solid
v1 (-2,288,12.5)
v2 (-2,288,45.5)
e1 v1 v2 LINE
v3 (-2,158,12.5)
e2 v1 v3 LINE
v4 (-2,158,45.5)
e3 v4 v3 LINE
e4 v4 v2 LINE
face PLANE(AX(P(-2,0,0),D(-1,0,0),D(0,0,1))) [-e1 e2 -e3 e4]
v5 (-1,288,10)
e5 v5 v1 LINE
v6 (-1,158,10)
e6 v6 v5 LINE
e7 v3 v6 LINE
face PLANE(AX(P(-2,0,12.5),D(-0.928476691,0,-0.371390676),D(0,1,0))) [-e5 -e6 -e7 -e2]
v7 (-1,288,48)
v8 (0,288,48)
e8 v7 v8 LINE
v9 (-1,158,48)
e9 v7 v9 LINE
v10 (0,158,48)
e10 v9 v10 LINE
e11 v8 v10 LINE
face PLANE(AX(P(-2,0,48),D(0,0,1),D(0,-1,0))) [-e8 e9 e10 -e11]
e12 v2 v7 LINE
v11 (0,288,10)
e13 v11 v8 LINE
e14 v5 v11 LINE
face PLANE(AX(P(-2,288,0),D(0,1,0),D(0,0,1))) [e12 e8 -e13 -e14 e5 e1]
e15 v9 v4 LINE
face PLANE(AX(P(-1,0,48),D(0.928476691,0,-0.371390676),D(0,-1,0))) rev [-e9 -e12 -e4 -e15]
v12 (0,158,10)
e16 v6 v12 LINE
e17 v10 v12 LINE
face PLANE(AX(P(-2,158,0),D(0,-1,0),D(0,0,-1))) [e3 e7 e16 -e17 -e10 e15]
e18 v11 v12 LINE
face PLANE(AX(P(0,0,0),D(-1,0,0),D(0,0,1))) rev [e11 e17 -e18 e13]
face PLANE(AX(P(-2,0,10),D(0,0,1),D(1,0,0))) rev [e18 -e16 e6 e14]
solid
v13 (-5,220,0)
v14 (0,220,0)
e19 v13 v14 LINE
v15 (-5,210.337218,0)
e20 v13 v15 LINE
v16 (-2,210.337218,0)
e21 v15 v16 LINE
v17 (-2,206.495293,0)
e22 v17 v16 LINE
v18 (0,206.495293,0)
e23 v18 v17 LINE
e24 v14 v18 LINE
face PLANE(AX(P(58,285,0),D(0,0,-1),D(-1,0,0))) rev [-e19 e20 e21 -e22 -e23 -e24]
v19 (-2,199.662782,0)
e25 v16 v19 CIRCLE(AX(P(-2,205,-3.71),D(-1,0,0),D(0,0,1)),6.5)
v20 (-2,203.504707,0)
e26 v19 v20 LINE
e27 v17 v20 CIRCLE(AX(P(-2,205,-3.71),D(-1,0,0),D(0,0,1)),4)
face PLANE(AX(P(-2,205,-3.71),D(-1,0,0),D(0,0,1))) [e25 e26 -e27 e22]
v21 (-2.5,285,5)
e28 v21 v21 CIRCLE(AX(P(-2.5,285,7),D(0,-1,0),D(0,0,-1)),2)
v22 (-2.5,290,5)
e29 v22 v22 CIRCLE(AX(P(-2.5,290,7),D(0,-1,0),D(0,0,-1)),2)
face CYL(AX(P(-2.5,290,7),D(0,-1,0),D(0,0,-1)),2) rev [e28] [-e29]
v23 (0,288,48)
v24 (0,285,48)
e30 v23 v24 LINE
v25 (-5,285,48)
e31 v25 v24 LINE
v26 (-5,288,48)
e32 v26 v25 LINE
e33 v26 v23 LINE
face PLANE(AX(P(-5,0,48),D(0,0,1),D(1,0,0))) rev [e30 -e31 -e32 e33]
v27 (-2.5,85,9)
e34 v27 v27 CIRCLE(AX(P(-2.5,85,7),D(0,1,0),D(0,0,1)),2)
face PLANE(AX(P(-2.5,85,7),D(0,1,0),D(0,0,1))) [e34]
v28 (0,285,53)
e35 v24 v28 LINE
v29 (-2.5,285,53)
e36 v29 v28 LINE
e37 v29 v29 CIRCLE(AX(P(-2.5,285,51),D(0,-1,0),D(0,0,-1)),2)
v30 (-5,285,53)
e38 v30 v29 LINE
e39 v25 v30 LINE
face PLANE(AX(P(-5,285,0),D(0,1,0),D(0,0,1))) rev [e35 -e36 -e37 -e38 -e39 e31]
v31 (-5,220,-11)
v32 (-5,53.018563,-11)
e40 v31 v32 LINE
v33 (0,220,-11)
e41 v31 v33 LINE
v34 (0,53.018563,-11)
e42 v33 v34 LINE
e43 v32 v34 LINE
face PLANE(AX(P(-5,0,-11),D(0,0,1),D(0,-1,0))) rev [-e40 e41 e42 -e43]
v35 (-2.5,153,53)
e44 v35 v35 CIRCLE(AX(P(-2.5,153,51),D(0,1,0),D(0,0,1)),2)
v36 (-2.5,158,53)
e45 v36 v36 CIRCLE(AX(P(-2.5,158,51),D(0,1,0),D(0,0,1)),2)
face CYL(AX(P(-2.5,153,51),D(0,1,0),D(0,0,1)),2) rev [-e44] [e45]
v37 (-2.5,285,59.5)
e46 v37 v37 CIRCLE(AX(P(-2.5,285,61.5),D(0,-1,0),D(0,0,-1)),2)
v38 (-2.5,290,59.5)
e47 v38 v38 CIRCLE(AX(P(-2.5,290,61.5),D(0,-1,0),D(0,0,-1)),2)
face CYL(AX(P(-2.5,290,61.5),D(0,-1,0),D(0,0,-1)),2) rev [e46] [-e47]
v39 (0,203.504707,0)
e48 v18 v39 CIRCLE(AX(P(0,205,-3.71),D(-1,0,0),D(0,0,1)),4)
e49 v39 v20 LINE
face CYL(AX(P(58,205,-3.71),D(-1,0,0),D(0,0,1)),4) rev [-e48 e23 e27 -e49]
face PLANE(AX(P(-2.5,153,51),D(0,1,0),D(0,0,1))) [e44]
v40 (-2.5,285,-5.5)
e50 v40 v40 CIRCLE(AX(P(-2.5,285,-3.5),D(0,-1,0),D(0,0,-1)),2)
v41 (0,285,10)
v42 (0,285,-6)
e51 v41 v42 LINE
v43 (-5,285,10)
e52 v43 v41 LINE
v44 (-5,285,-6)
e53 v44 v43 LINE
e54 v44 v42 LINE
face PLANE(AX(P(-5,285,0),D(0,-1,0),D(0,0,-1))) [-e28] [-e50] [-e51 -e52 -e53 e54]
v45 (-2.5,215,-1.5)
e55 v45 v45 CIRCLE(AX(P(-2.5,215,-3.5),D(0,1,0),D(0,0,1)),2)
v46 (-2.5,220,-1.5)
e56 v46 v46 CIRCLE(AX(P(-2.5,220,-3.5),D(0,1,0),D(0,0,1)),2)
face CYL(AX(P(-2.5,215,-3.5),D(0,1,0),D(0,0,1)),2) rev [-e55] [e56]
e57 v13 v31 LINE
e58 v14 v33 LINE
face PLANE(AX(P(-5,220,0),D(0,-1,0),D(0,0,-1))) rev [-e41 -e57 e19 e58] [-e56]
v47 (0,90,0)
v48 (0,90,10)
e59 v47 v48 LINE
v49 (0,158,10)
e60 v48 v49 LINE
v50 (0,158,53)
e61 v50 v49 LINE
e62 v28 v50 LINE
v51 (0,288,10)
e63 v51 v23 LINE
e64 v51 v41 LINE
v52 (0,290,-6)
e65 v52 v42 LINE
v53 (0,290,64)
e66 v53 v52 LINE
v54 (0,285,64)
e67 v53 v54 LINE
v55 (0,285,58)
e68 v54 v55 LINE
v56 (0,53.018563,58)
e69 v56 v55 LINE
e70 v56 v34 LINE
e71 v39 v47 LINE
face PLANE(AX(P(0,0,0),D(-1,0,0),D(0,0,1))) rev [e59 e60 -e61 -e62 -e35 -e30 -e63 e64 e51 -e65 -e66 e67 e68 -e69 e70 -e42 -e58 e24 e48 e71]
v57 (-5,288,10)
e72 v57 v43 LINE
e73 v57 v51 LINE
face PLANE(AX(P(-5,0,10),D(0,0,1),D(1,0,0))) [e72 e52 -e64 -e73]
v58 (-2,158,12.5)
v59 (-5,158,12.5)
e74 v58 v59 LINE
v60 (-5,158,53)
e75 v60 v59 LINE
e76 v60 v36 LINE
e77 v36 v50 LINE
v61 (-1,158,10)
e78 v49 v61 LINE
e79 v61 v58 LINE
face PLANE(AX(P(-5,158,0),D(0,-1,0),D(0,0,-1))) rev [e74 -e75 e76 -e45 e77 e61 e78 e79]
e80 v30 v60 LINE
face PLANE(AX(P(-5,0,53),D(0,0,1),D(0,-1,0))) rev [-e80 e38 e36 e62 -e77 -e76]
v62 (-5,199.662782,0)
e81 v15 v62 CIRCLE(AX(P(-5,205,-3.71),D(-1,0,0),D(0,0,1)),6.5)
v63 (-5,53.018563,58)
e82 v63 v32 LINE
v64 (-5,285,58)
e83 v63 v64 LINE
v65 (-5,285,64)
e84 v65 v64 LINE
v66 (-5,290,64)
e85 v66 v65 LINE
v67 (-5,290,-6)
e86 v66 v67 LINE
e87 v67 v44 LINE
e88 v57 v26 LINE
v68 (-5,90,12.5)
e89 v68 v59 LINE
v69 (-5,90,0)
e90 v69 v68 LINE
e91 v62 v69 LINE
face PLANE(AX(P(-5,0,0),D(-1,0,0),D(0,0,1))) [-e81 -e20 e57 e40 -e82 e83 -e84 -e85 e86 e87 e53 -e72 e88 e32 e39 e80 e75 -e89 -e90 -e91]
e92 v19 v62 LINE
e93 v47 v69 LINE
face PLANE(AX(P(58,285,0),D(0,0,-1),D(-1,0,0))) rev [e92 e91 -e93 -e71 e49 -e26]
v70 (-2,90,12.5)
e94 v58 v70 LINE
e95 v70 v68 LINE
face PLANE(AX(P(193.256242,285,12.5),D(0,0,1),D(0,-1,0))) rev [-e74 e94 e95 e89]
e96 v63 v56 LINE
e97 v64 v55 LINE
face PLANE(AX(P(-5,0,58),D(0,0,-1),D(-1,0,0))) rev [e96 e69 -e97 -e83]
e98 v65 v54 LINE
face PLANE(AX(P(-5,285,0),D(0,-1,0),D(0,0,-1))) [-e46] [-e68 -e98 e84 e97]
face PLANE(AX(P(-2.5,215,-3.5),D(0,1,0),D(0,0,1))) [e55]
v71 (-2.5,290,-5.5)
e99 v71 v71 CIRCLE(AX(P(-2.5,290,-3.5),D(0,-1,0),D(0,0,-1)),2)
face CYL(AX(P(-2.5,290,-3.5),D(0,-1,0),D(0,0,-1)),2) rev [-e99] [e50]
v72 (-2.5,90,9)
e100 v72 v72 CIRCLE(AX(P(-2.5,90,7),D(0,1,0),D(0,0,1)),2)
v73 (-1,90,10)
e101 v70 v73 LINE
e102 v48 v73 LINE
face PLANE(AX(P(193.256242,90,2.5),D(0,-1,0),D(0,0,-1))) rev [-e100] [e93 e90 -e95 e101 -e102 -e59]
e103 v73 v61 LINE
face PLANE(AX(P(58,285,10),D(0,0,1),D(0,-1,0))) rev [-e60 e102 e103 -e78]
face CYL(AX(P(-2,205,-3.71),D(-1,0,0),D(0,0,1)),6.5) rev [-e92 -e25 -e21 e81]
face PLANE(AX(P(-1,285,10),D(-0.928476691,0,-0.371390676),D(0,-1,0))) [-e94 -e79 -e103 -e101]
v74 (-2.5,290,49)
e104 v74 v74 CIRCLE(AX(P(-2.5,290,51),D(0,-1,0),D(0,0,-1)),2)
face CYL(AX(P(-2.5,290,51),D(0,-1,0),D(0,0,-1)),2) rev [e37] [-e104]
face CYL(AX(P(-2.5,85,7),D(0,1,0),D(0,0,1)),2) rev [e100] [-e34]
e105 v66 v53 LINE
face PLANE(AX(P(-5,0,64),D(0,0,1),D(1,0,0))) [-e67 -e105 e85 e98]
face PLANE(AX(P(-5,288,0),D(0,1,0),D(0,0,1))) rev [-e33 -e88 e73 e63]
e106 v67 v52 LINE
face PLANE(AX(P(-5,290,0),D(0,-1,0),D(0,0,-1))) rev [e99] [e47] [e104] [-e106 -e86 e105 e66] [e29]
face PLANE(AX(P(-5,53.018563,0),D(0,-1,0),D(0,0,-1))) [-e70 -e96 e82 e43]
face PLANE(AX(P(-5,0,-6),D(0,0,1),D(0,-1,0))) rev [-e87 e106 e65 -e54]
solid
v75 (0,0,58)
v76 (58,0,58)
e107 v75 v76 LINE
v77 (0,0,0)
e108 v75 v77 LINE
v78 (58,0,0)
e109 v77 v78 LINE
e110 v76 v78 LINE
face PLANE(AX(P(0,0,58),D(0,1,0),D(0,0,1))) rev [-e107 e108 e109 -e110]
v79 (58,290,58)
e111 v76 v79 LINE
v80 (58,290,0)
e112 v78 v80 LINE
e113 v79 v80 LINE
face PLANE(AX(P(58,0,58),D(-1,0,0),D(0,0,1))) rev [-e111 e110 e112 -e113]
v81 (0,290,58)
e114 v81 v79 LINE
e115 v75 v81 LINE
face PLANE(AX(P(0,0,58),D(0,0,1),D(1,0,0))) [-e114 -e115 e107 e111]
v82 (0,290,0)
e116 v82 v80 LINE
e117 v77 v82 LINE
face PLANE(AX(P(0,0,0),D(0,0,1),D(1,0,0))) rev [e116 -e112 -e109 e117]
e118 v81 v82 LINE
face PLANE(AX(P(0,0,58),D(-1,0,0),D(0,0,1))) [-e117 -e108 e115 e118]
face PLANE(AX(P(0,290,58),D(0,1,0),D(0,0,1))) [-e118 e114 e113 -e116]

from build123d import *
from OCP.BRepFilletAPI import BRepFilletAPI_MakeChamfer

# Parameters (mm, degrees)
ESQUISSE1_W              = 58
ESQUISSE1_H              = 58
BOSS_EXTRU_2_DEPTH       = 58
BOSS_EXTRU_3_DEPTH       = 5
BOSS_EXTRU_4_DEPTH       = 2
ESQUISSE11_R             = 2
ENL_V_MAT_EXTRU_18_DEPTH = 5
ESQUISSE12_R             = 2
ENL_V_MAT_EXTRU_19_DEPTH = 5
ESQUISSE13_R             = 2
ENL_V_MAT_EXTRU_20_DEPTH = 298.800268637
ESQUISSE14_W             = 10
ESQUISSE14_H             = 195
ENL_V_MAT_EXTRU_21_DEPTH = 3
ESQUISSE15_W             = 7.5
ESQUISSE15_H             = 195
ENL_V_MAT_EXTRU_22_DEPTH = 303.978547095
CHANFREIN3_SIZE          = 1
CHANFREIN3_SIZE2         = 2.5
CHANFREIN4_SIZE2         = 1
CHANFREIN4_SIZE          = 2.5
ESQUISSE16_R             = 2
ENL_V_MAT_EXTRU_23_DEPTH = 5
ESQUISSE17_W             = 2.5
ESQUISSE17_H             = 195
ENL_V_MAT_EXTRU_24_DEPTH = 304.586890363
ESQUISSE18_R             = 6.5
ESQUISSE18_R_2           = 4
ENL_V_MAT_EXTRU_25_DEPTH = 3
ENL_V_MAT_EXTRU_26_DEPTH = 304.586890363


with BuildPart() as part:
    # Esquisse1 → Boss.-Extru.2 (new body)
    with BuildSketch(Plane.XY):
        with Locations((29, 261)):
            Rectangle(ESQUISSE1_W, ESQUISSE1_H)
        with Locations((29, 203)):
            Rectangle(ESQUISSE1_W, ESQUISSE1_H)
        with Locations((29, 145)):
            Rectangle(ESQUISSE1_W, ESQUISSE1_H)
        with Locations((29, 87)):
            Rectangle(ESQUISSE1_W, ESQUISSE1_H)
        with Locations((29, 29)):
            Rectangle(ESQUISSE1_W, ESQUISSE1_H)
    extrude(amount=BOSS_EXTRU_2_DEPTH)


with BuildPart() as body_2:
    # Esquisse3 → Boss.-Extru.3 (new body)
    with BuildSketch(Plane.ZY):
        Polygon((64, 290), (-6, 290), (-6, 285), (0, 285), (0, 220), (-11, 220), (-11, 53.018562931), (58, 53.018562931), (58, 285), (64, 285), align=None)
        Polygon((53, 285), (53, 158), (5, 158), (5, 285), (10, 285), (10, 288), (48, 288), (48, 285), align=None, mode=Mode.SUBTRACT)
    extrude(amount=BOSS_EXTRU_3_DEPTH)

    # Esquisse11 → Enlèv. mat.-Extru.18 (cut)
    with BuildSketch(Plane(origin=(0, 158, 0), x_dir=(1, 0, 0), z_dir=(0, 1, 0))):
        with Locations(Location((-2.5, -51, 0), (0, 0, 270))):
            Circle(ESQUISSE11_R)
    extrude(amount=-ENL_V_MAT_EXTRU_18_DEPTH, mode=Mode.SUBTRACT)

    # Esquisse12 → Enlèv. mat.-Extru.19 (cut)
    with BuildSketch(Plane(origin=(0, 220, 0), x_dir=(1, 0, 0), z_dir=(0, 1, 0))):
        with Locations(Location((-2.5, 3.5, 0), (0, 0, 270))):
            Circle(ESQUISSE12_R)
    extrude(amount=-ENL_V_MAT_EXTRU_19_DEPTH, mode=Mode.SUBTRACT)

    # Esquisse13 → Enlèv. mat.-Extru.20 (cut, through all)
    with BuildSketch(Plane(origin=(0, 285, 0), x_dir=(-1, 0, 0), z_dir=(0, -1, 0))):
        with Locations(Location((2.5, -7, 0), (0, 0, 90))):
            Circle(ESQUISSE13_R)
        with Locations(Location((2.5, 3.5, 0), (0, 0, 270))):
            Circle(ESQUISSE13_R)
        with Locations(Location((2.5, -61.5, 0), (0, 0, 90))):
            Circle(ESQUISSE13_R)
        with Locations(Location((2.5, -51, 0), (0, 0, 270))):
            Circle(ESQUISSE13_R)
    extrude(amount=-ENL_V_MAT_EXTRU_20_DEPTH, mode=Mode.SUBTRACT)

    # Esquisse14 → Enlèv. mat.-Extru.21 (cut)
    with BuildSketch(Plane.ZY.offset(5)):
        with Locations((7.5, 187.5)):
            Rectangle(ESQUISSE14_W, ESQUISSE14_H)
    extrude(amount=-ENL_V_MAT_EXTRU_21_DEPTH, mode=Mode.SUBTRACT)

    # Esquisse15 → Enlèv. mat.-Extru.22 (cut, through all)
    with BuildSketch(Plane.ZY.offset(2)):
        with Locations((6.25, 187.5)):
            Rectangle(ESQUISSE15_W, ESQUISSE15_H)
    extrude(amount=-ENL_V_MAT_EXTRU_22_DEPTH, mode=Mode.SUBTRACT)

    # Chanfrein4
    chanfrein4_edges = [body_2.edges().sort_by_distance(p)[0] for p in [
        (-2, 124, 10),
    ]]
    chanfrein4_side = [body_2.faces().sort_by_distance(p)[0] for p in [
        (-2, 124, 10.02),
    ]]
    chamfer(chanfrein4_edges, length=CHANFREIN4_SIZE - 0.0001, length2=CHANFREIN4_SIZE2 - 0.0001, reference=chanfrein4_side[0])  # a hair under: the kernel refuses the full size

    # Esquisse16 → Enlèv. mat.-Extru.23 (cut)
    with BuildSketch(Plane(origin=(0, 90, 0), x_dir=(1, 0, 0), z_dir=(0, 1, 0))):
        with Locations(Location((-2.5, -7, 0), (0, 0, 90))):
            Circle(ESQUISSE16_R)
    extrude(amount=-ENL_V_MAT_EXTRU_23_DEPTH, mode=Mode.SUBTRACT)

    # Esquisse17 → Enlèv. mat.-Extru.24 (cut, through all)
    with BuildSketch(Plane.ZY.offset(5)):
        with Locations((1.25, 187.5)):
            Rectangle(ESQUISSE17_W, ESQUISSE17_H)
    extrude(amount=-ENL_V_MAT_EXTRU_24_DEPTH, mode=Mode.SUBTRACT)

    # Esquisse18 → Enlèv. mat.-Extru.25 (cut)
    with BuildSketch(Plane.ZY.offset(5)):
        with Locations((-3.71, 205)):
            Circle(ESQUISSE18_R)
        with Locations((-3.71, 205)):
            Circle(ESQUISSE18_R_2, mode=Mode.SUBTRACT)
    extrude(amount=-ENL_V_MAT_EXTRU_25_DEPTH, mode=Mode.SUBTRACT)

    # Esquisse18<2> → Enlèv. mat.-Extru.26 (cut, through all)
    with BuildSketch(Plane.ZY.offset(5)):
        with BuildLine():
            Line((0, 203.504707386), (0, 206.495292614))
            ThreePointArc((0, 206.495292614), (-7.71, 205), (0, 203.504707386))
        make_face()
        with BuildLine():
            ThreePointArc((0.29, 205), (0.216830783, 205.761577311), (0, 206.495292614))
            Line((0, 206.495292614), (0, 203.504707386))
            ThreePointArc((0, 203.504707386), (0.216830783, 204.238422689), (0.29, 205))
        make_face()
    extrude(amount=-ENL_V_MAT_EXTRU_26_DEPTH, mode=Mode.SUBTRACT)


with BuildPart() as body_3:
    # Esquisse3<3> → Boss.-Extru.4 (new body)
    with BuildSketch(Plane.ZY):
        Polygon((48, 158), (48, 285), (48, 288), (10, 288), (10, 285), (10, 158), align=None)
    extrude(amount=BOSS_EXTRU_4_DEPTH)

    # Chanfrein3: one chamfer whose edges measure the first distance from different faces: ONE call of the kernel's chamfer builder (chamfer() names one face for all edges)
    chanfrein3_edges_1 = [body_3.edges().sort_by_distance(p)[0] for p in [
        (-2, 223, 48),
    ]]
    chanfrein3_side_1 = [body_3.faces().sort_by_distance(p)[0] for p in [
        (-1, 223, 48),
    ]]
    chanfrein3_edges_2 = [body_3.edges().sort_by_distance(p)[0] for p in [
        (-2, 223, 10),
    ]]
    chanfrein3_side_2 = [body_3.faces().sort_by_distance(p)[0] for p in [
        (-1, 223, 10),
    ]]
    chanfrein3 = BRepFilletAPI_MakeChamfer(body_3.part.solid().wrapped)
    for e in chanfrein3_edges_1:
        chanfrein3.Add(CHANFREIN3_SIZE, CHANFREIN3_SIZE2, e.wrapped, chanfrein3_side_1[0].wrapped)  # the first distance lies on this face
    for e in chanfrein3_edges_2:
        chanfrein3.Add(CHANFREIN3_SIZE, CHANFREIN3_SIZE2, e.wrapped, chanfrein3_side_2[0].wrapped)  # the first distance lies on this face
    add(Compound.cast(chanfrein3.Shape()), mode=Mode.REPLACE)


solid = Compound([part.part, body_2.part, body_3.part])
